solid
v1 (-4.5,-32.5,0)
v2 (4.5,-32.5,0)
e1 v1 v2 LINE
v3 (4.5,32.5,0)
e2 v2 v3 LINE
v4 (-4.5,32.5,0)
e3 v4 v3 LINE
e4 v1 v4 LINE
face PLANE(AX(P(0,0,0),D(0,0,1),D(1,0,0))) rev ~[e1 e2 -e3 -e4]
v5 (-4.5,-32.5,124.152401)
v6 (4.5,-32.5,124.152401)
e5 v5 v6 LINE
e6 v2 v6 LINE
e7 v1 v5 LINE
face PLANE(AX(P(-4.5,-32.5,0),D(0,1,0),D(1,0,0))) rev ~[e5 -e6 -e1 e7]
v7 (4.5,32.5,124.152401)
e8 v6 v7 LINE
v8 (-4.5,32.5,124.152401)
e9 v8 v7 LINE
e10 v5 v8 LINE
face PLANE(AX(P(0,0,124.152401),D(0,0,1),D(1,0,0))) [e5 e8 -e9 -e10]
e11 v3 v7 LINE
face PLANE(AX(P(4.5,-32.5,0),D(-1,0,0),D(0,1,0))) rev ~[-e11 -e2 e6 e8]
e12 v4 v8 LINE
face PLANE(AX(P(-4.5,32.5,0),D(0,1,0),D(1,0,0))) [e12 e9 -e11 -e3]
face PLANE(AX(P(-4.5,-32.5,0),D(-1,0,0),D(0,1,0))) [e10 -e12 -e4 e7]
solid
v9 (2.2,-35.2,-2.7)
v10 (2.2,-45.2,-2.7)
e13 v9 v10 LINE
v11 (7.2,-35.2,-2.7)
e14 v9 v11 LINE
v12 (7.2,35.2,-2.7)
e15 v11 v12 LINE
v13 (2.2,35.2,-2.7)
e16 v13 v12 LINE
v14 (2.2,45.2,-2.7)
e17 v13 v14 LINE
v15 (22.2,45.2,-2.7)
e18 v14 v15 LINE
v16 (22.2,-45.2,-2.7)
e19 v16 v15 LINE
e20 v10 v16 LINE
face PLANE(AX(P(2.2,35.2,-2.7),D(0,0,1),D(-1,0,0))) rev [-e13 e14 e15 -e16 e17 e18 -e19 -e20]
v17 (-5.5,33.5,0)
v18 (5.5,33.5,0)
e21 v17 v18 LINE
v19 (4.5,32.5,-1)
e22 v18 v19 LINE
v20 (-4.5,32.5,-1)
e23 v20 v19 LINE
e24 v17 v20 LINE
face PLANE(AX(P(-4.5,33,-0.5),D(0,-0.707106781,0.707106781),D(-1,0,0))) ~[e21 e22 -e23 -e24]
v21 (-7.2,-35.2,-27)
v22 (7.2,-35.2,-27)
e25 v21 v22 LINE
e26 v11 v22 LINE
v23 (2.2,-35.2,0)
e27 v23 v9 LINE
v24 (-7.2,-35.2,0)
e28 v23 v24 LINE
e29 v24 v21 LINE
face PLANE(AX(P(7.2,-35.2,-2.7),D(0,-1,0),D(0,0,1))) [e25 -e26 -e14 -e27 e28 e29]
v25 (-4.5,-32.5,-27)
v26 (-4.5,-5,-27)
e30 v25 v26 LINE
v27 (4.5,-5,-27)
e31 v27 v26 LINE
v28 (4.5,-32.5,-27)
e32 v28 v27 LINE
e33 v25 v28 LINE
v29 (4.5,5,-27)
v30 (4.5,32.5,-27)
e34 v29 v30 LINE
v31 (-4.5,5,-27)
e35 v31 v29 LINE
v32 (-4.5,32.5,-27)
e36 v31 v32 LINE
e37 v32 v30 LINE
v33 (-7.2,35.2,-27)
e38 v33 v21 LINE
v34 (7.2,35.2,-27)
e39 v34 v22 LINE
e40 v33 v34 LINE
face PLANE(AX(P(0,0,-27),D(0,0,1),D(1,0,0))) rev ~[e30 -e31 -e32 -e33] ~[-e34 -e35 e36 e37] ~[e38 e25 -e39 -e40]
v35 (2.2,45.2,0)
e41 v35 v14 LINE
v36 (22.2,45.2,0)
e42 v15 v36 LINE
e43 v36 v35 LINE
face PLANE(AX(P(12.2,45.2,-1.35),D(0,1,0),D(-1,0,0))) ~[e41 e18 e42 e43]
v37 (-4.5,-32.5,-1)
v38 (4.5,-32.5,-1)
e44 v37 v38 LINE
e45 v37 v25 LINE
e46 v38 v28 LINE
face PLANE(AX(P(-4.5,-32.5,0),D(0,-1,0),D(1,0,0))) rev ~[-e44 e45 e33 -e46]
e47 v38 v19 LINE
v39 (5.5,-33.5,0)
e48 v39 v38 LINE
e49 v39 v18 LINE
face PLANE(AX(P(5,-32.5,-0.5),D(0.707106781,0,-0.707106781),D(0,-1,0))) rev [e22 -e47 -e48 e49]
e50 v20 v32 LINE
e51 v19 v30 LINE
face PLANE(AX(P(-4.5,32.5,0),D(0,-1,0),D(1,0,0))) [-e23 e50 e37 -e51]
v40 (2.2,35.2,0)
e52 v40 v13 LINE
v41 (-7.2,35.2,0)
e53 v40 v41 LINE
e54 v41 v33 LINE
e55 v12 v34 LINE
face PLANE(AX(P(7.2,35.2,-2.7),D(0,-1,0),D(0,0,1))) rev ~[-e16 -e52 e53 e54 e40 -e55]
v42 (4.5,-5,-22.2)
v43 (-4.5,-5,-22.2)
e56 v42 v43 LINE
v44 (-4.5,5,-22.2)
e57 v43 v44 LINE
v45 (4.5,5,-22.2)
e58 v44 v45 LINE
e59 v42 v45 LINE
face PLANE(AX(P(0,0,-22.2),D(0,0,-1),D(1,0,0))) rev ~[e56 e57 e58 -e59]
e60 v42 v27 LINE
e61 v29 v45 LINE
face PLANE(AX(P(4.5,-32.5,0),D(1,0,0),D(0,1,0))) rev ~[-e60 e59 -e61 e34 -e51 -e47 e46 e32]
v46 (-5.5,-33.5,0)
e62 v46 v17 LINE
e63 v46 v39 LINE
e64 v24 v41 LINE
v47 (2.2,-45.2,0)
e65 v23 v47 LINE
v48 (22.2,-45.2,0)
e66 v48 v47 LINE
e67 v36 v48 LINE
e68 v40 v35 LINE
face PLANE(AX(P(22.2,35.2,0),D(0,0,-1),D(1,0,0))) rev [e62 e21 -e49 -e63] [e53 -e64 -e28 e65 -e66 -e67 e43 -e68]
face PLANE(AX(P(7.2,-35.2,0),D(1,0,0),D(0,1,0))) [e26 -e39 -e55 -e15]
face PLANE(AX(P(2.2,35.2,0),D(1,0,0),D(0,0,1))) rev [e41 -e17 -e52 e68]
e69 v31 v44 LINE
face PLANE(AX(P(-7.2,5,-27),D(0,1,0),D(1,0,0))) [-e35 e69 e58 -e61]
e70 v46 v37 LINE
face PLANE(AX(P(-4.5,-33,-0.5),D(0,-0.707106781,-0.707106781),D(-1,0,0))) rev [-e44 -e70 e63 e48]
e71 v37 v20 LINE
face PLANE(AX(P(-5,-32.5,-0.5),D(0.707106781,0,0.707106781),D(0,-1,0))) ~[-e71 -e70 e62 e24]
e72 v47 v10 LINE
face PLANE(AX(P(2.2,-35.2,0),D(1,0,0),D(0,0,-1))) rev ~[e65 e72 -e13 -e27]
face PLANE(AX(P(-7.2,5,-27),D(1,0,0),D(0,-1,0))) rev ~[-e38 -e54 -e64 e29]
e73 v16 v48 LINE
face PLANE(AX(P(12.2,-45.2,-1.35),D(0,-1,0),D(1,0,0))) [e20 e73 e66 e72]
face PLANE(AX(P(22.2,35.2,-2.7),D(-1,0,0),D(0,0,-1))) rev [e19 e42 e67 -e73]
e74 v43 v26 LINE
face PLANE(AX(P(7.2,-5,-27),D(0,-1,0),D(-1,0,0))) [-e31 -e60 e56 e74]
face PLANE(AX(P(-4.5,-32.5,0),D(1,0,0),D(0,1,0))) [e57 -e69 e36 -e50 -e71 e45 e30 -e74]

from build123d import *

# Parameters (mm, degrees)
F0_W      = 9
F0_H      = 65
F1_DEPTH  = 124.1524014622
F3_W      = 14.4
F3_H      = 70.4
F3_W_2    = 9
F3_H_2    = 65
F4_DEPTH  = 27
F5_W      = 70.4
F5_H      = 2.7
F6_DEPTH  = 15
F8_DEPTH  = 10
F10_W     = 9
F10_H     = 10
F10_W_2   = 2.7
F11_DEPTH = 4.8
F12_SIZE  = 1


with BuildPart() as f1:
    # F0 (on Top) → F1 (new body)
    with BuildSketch(Plane.XY):
        Rectangle(F0_W, F0_H)
    extrude(amount=F1_DEPTH)


with BuildPart() as f4:
    # F3 (on face) → F4 (new body)
    with BuildSketch(Plane.XY):
        Rectangle(F3_W, F3_H)
        Rectangle(F3_W_2, F3_H_2, mode=Mode.SUBTRACT)
    extrude(amount=-F4_DEPTH)

    # F5 (on face) → F6 (join)
    with BuildSketch(Plane.YZ.offset(7.2)):
        with Locations((0, -1.35)):
            Rectangle(F5_W, F5_H)
    extrude(amount=F6_DEPTH)

    # F7 (on face) → F8 (join)
    with BuildSketch(Plane.XZ.offset(35.2)):
        Polygon((22.2, -2.7), (22.2, 0), (2.2, 0), (2.2, -2.7), (7.2, -2.7), align=None)
    extrude(amount=F8_DEPTH)

    # F9: F4 across plane


with BuildPart() as f4_1:
    add(f4.part)
    add(f4.part.mirror(Plane.XZ))

    # F10 (on face) → F11 (join)
    with BuildSketch(Plane(origin=(0, 0, -27), x_dir=(1, 0, 0), z_dir=(0, 0, -1))):
        Rectangle(F10_W, F10_H)
        with Locations((-5.85, 0)):
            Rectangle(F10_W_2, F10_H)
        with Locations((5.85, 0)):
            Rectangle(F10_W_2, F10_H)
    extrude(amount=-F11_DEPTH)

    # F12
    f12_edges = [f4_1.edges().sort_by_distance(p)[0] for p in [
        (4.5, 0, 0),
        (0, -32.5, 0),
        (-4.5, 0, 0),
        (0, 32.5, 0),
    ]]
    chamfer(f12_edges, length=F12_SIZE)


solid = Compound([f1.part, f4_1.part])
